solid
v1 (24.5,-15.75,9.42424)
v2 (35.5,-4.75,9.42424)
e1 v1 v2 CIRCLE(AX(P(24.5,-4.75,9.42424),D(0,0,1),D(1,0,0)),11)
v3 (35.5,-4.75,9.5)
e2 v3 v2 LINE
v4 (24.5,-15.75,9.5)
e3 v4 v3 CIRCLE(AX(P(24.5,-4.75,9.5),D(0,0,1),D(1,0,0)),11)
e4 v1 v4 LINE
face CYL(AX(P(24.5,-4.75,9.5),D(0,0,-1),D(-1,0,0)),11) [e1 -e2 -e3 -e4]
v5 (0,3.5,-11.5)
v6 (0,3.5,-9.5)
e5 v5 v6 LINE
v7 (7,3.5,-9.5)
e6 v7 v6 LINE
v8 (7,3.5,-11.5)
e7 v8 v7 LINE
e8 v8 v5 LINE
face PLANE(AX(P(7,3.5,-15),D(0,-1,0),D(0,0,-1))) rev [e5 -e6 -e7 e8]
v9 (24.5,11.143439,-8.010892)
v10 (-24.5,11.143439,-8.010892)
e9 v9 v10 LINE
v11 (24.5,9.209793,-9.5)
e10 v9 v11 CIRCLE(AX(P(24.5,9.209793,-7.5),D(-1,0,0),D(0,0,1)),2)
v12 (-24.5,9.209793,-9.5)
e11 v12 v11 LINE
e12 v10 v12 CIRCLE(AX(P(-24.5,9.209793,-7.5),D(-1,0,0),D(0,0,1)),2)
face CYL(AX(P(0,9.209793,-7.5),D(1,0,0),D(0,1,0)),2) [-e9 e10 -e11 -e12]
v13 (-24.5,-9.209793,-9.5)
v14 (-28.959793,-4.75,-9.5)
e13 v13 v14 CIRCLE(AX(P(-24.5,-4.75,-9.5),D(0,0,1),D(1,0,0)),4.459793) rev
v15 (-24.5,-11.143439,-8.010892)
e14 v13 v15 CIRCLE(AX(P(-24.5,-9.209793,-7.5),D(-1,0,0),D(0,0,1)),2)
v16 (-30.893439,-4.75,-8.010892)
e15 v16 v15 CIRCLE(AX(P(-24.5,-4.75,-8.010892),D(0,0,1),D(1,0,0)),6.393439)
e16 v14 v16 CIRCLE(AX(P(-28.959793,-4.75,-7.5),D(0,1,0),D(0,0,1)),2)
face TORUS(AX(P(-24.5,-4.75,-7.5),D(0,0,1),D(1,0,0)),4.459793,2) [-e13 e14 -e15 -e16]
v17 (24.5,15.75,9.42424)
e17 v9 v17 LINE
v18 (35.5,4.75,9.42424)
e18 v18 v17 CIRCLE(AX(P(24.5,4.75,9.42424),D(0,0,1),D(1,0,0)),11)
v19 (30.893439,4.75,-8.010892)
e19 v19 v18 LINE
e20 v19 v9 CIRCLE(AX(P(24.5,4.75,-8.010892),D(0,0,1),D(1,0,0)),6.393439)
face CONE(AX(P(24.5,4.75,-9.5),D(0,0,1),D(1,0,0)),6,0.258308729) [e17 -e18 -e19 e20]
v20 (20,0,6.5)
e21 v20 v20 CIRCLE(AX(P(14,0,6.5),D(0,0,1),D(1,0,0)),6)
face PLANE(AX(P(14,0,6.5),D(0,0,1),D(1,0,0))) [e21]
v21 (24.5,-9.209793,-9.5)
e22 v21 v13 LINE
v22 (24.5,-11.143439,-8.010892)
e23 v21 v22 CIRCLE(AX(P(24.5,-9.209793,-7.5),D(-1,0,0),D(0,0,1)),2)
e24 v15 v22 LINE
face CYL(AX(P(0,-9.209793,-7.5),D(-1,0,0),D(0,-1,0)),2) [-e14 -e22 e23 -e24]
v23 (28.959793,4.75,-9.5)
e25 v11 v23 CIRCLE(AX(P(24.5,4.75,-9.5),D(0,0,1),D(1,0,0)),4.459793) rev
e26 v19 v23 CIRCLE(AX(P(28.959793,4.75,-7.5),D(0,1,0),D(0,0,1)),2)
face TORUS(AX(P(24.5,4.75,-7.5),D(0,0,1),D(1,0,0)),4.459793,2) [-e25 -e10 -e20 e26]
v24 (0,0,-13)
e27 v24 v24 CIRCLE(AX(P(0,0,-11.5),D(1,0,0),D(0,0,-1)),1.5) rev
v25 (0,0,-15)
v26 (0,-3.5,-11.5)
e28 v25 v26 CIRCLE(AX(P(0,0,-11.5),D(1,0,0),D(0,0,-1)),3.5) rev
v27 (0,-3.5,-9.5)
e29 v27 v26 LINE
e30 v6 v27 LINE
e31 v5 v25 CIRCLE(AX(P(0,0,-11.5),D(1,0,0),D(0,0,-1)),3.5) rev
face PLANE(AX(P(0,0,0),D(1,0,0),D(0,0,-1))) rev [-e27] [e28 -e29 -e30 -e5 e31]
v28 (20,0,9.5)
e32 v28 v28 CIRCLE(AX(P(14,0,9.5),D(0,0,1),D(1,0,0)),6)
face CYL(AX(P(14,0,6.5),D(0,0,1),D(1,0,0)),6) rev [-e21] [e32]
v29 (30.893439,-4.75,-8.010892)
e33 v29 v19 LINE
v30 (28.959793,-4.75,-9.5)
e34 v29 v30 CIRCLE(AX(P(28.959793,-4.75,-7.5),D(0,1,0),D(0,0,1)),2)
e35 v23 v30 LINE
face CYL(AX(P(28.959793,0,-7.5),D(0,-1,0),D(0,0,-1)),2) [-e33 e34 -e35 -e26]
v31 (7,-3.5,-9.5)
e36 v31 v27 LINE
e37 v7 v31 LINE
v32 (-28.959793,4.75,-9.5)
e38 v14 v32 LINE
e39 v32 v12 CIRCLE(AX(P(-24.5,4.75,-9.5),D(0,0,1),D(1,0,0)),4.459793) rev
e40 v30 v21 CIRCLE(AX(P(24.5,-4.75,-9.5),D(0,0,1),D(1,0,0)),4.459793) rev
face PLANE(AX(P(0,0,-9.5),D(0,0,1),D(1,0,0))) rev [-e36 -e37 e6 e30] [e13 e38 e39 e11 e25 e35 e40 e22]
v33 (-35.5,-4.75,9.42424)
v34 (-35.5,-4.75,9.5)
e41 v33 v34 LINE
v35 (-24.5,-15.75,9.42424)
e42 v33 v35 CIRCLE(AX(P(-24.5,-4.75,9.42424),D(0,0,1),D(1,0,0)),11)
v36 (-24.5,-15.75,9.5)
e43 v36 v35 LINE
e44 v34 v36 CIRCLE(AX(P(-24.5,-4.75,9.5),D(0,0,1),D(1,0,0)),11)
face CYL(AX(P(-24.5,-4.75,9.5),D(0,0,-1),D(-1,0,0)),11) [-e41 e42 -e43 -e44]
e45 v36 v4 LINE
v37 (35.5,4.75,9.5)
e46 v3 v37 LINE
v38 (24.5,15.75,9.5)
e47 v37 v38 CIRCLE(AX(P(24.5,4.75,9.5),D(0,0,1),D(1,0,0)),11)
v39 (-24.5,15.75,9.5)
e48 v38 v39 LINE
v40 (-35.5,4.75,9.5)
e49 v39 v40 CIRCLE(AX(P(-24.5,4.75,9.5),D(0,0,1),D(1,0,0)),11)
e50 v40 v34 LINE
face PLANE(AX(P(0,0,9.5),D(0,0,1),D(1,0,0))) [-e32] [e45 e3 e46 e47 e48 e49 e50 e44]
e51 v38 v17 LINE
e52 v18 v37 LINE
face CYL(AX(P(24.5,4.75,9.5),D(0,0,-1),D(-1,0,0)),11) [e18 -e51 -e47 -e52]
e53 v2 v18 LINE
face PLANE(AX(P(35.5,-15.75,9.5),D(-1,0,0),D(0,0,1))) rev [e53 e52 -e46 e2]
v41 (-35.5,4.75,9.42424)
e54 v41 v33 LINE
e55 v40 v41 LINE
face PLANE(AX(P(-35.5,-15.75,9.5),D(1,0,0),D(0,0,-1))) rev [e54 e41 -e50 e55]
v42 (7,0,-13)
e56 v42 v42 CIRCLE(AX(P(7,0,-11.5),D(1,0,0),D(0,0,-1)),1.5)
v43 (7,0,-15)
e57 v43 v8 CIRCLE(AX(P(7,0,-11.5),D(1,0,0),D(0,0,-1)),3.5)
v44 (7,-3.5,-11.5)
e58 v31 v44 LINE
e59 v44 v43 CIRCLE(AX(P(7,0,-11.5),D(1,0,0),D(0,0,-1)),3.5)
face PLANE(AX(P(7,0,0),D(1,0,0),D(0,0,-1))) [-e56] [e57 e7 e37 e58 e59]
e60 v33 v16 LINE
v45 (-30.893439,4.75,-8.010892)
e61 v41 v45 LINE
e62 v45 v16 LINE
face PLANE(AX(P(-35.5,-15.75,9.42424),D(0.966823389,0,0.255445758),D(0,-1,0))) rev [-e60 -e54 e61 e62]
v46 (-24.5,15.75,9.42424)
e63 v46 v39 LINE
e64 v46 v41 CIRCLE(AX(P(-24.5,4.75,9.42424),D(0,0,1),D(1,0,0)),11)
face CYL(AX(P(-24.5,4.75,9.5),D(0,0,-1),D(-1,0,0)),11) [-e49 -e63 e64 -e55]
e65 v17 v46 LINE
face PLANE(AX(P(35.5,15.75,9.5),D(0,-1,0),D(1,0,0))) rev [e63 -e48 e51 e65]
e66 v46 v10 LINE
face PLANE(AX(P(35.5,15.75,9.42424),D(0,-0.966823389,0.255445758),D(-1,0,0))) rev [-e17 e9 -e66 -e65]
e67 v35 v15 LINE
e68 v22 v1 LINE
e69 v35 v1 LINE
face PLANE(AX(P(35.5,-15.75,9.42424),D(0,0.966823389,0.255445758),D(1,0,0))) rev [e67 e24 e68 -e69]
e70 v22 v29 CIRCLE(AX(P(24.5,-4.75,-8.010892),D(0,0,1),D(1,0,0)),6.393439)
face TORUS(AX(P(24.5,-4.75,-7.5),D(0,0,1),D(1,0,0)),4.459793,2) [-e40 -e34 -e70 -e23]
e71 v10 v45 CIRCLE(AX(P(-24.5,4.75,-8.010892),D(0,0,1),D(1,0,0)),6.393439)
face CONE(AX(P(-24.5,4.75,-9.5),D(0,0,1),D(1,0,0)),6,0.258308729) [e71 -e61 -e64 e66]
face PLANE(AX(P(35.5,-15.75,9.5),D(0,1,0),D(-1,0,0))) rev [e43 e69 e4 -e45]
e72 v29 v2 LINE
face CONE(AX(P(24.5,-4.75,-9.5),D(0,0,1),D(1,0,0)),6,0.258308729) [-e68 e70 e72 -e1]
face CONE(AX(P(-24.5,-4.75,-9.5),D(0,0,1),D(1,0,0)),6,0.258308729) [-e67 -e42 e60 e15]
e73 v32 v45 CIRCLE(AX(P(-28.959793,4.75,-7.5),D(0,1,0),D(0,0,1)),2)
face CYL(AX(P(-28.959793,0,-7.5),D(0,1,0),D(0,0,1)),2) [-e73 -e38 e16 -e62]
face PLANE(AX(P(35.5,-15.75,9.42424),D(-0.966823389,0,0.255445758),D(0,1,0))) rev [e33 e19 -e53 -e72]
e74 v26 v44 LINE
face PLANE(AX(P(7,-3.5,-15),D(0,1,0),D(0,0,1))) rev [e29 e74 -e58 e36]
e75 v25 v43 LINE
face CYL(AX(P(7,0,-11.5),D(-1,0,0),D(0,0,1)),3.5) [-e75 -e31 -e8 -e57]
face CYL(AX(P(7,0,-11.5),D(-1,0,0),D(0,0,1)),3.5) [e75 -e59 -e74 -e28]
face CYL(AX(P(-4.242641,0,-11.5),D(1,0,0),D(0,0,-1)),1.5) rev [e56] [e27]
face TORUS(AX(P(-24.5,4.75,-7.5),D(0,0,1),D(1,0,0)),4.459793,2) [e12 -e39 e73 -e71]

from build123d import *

# Parameters (mm, degrees)
SKETCH1_W           = 71
SKETCH1_H           = 31.5
BOSS_EXTRUDE1_DEPTH = 9.5
FILLET1_R           = 11
CHAMFER1_SIZE       = 5
CHAMFER1_SIZE2      = 18.924240442
SKETCH2_W           = 5.5
SKETCH2_H           = 7
BOSS_EXTRUDE2_DEPTH = 7
FILLET2_R           = 3.5
SKETCH3_R           = 1.5
CUT_EXTRUDE1_DEPTH  = 7
FILLET3_R           = 2
SKETCH4_R           = 6
CUT_EXTRUDE2_DEPTH  = 3


with BuildPart() as part:
    # Sketch1 → Boss-Extrude1 (new, symmetric)
    with BuildSketch(Plane.XY):
        Rectangle(SKETCH1_W, SKETCH1_H)
    extrude(amount=BOSS_EXTRUDE1_DEPTH, both=True)

    # Fillet1
    fillet1_edges = [part.edges().sort_by_distance(p)[0] for p in [
        (-35.5, 15.75, 0),
        (35.5, 15.75, 0),
        (35.5, -15.75, 0),
        (-35.5, -15.75, 0),
    ]]
    fillet(fillet1_edges, radius=FILLET1_R)

    # Chamfer1
    chamfer1_edges = [part.edges().sort_by_distance(p)[0] for p in [
        (0, -15.75, -9.5),
        (-35.5, 0, -9.5),
        (0, 15.75, -9.5),
        (35.5, 0, -9.5),
        (32.278174593, 12.528174593, -9.5),
        (32.278174593, -12.528174593, -9.5),
        (-32.278174593, 12.528174593, -9.5),
        (-32.278174593, -12.528174593, -9.5),
    ]]
    chamfer1_side = [part.faces().sort_by_distance(p)[0] for p in [
        (0, 0, -9.5),
    ]]
    chamfer(chamfer1_edges, length=CHAMFER1_SIZE, length2=CHAMFER1_SIZE2, reference=chamfer1_side[0])

    # Sketch2 → Boss-Extrude2 (add)
    with BuildSketch(Plane(origin=(0, 0, 0), x_dir=(0, 0, -1), z_dir=(1, 0, 0))):
        with Locations((12.25, 0)):
            Rectangle(SKETCH2_W, SKETCH2_H)
    extrude(amount=BOSS_EXTRUDE2_DEPTH)

    # Fillet2
    fillet2_edges = [part.edges().sort_by_distance(p)[0] for p in [
        (3.5, -3.5, -15),
        (3.5, 3.5, -15),
    ]]
    fillet(fillet2_edges, radius=FILLET2_R - 0.0001)  # a hair under: the kernel refuses the full size

    # Sketch3 → Cut-Extrude1 (cut)
    with BuildSketch(Plane(origin=(7, 0, 0), x_dir=(0, 0, -1), z_dir=(1, 0, 0))):
        with Locations((11.5, 0)):
            Circle(SKETCH3_R)
    extrude(amount=-CUT_EXTRUDE1_DEPTH, mode=Mode.SUBTRACT)

    # Fillet3
    fillet3_edges = [part.edges().sort_by_distance(p)[0] for p in [
        (0, 10.75, -9.5),
        (-28.742640687, 8.992640687, -9.5),
        (28.742640687, 8.992640687, -9.5),
        (-30.5, 0, -9.5),
        (30.5, 0, -9.5),
        (-28.742640687, -8.992640687, -9.5),
        (28.742640687, -8.992640687, -9.5),
        (0, -10.75, -9.5),
    ]]
    fillet(fillet3_edges, radius=FILLET3_R)

    # Sketch4 → Cut-Extrude2 (cut)
    with BuildSketch(Plane.XY.offset(9.5)):
        with Locations((14, 0)):
            Circle(SKETCH4_R)
    extrude(amount=-CUT_EXTRUDE2_DEPTH, mode=Mode.SUBTRACT)


solid = part.part
